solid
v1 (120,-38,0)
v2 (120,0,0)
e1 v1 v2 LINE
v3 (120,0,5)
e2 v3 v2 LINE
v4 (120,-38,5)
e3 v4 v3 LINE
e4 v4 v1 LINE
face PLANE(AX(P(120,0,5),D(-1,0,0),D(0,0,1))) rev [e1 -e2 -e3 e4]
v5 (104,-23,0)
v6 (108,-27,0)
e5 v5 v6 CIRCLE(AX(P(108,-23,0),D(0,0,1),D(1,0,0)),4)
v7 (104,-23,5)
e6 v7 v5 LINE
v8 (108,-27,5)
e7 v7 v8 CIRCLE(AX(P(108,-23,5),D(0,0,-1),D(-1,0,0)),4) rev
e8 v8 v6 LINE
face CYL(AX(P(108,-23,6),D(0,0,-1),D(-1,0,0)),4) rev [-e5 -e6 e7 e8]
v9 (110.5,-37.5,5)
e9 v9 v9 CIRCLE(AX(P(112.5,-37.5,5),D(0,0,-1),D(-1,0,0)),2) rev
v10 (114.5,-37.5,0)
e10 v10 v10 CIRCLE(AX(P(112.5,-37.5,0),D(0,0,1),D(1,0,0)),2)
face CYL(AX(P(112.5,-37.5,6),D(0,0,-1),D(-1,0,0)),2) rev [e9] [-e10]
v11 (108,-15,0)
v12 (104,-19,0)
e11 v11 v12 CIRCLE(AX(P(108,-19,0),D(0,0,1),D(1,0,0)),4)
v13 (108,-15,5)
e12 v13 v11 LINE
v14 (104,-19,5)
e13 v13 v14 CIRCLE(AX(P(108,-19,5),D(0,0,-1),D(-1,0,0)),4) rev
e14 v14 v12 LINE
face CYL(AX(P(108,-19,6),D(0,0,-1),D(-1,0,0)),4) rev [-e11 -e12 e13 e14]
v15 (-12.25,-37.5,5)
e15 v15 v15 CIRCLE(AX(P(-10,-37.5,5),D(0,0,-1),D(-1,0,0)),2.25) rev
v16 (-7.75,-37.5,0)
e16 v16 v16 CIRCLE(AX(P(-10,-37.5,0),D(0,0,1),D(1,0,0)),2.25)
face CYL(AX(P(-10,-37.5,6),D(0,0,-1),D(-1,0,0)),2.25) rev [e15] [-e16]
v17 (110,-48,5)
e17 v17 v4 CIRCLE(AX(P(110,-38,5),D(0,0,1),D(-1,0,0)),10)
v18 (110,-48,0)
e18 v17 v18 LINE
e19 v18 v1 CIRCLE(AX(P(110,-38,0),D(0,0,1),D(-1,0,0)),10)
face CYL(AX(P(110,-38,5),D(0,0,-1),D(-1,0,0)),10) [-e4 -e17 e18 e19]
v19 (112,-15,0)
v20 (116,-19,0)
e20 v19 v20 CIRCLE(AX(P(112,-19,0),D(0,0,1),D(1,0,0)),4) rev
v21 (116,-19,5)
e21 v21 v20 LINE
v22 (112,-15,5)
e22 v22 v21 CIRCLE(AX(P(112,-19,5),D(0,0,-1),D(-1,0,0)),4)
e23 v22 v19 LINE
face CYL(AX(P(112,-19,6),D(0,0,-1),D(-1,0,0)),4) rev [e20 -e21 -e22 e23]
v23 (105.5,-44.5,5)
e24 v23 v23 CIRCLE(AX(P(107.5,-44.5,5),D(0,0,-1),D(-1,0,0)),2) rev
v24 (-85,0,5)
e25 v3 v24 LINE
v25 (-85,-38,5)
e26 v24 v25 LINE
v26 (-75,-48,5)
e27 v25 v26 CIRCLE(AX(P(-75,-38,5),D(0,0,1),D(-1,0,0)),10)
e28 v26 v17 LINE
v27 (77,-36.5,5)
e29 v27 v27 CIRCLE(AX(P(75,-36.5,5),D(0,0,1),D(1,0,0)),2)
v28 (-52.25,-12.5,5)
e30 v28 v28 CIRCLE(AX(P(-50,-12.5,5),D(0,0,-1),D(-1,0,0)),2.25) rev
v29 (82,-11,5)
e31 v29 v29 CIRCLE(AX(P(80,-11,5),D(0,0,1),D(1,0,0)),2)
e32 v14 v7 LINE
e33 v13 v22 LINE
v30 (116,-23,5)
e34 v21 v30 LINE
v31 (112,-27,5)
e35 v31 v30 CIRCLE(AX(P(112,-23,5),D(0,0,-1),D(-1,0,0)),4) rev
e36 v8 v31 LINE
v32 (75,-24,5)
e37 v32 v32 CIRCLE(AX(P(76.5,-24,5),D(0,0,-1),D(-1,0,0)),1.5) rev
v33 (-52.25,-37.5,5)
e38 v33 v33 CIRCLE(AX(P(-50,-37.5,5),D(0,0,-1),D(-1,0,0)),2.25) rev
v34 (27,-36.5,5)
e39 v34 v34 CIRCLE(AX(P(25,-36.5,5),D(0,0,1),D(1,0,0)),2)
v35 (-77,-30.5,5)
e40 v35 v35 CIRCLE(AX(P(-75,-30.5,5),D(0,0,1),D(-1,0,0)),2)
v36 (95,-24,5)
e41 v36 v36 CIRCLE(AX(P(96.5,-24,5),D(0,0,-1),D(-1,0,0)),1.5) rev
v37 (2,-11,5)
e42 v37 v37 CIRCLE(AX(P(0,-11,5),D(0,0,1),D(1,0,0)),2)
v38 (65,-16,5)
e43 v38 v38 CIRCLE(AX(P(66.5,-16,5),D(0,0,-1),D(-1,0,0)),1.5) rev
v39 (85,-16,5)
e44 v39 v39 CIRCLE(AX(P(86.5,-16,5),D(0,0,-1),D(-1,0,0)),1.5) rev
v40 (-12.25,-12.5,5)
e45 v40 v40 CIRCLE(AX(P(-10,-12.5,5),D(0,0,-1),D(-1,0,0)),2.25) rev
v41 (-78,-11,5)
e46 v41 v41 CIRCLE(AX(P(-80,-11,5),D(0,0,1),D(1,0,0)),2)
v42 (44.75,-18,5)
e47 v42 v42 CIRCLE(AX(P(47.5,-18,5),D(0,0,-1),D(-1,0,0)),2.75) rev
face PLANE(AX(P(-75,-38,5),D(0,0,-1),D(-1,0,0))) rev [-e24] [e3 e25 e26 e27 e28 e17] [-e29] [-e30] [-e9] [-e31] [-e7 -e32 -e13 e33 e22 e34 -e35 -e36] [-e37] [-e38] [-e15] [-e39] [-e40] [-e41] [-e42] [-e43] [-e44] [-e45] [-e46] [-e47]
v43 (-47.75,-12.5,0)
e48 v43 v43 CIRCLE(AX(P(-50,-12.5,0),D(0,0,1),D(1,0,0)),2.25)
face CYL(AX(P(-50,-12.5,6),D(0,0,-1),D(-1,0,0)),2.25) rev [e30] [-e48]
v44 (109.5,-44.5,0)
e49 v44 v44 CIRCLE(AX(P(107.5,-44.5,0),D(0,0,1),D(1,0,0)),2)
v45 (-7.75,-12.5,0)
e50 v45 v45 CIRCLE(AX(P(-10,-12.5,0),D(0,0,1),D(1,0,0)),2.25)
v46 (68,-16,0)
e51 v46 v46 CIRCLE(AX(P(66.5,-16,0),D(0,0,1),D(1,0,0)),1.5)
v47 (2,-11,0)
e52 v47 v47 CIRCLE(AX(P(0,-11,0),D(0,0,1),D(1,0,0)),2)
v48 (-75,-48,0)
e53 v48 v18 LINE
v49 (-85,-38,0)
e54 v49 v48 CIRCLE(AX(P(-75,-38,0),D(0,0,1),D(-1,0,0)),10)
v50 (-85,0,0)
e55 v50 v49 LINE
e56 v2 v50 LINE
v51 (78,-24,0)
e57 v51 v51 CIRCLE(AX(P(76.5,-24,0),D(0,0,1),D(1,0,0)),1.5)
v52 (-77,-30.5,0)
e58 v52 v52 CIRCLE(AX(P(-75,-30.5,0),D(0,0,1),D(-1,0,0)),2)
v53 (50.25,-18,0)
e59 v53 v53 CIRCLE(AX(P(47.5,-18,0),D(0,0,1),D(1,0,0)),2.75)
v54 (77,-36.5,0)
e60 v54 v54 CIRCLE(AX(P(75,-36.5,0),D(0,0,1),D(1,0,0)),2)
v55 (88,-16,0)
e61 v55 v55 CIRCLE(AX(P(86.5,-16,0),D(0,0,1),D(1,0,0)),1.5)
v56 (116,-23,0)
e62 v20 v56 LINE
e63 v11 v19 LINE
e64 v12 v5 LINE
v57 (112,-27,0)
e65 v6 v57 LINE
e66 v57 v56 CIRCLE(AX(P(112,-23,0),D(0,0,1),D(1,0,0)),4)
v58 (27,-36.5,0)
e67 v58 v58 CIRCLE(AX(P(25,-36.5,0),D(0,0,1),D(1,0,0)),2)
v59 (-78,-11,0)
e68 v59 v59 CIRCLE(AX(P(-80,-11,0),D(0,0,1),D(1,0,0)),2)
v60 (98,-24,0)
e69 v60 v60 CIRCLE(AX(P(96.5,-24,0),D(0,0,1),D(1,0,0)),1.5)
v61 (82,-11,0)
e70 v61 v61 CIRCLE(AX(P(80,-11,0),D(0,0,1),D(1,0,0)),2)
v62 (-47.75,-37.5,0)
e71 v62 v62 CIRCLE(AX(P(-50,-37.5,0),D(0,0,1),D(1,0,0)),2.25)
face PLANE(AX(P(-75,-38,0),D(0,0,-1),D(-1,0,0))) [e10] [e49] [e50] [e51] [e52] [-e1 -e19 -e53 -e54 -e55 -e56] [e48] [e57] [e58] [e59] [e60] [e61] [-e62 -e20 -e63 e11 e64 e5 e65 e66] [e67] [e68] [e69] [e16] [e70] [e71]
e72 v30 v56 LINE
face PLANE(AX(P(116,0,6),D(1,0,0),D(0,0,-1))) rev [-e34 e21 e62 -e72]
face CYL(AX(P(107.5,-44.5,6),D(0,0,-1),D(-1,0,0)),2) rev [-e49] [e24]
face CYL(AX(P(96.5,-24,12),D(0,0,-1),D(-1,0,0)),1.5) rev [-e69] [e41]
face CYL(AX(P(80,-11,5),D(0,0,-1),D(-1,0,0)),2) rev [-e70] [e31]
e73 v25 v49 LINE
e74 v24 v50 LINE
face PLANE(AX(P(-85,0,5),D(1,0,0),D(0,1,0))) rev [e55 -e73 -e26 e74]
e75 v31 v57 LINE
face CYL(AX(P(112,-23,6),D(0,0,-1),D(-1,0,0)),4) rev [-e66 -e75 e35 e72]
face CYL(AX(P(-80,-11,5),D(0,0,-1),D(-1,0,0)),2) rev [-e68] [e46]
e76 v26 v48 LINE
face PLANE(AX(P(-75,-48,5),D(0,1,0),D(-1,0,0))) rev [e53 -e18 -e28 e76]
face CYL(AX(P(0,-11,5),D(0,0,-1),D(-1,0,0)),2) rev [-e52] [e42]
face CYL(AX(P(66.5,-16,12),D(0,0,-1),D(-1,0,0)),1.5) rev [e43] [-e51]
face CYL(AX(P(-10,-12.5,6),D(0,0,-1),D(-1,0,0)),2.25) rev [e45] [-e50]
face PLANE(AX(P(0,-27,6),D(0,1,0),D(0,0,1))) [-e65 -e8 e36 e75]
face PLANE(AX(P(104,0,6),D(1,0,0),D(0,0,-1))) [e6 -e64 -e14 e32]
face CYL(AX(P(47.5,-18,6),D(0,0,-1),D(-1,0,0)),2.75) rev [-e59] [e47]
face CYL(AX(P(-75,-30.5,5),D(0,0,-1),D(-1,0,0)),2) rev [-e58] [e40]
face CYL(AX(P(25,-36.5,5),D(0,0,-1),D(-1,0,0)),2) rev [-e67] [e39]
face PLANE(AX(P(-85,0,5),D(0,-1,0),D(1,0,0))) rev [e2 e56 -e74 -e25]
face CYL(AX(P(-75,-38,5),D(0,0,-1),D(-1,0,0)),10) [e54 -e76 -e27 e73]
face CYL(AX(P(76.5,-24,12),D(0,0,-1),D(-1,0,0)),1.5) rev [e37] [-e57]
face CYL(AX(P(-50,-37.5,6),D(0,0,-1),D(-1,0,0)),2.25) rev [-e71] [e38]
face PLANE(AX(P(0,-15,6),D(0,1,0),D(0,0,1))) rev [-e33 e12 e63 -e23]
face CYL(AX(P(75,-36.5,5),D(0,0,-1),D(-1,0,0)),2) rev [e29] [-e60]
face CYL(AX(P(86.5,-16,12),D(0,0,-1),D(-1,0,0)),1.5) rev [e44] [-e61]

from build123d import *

# Parameters (mm, degrees)
SKETCH_1_R              = 2
EXTRUDE_1_DEPTH         = 5
SKETCH_2_R              = 2.75
SKETCH_2_R_2            = 2
SKETCH_2_R_3            = 2.25
CUT_EXTRUDE_2_DEPTH     = 6
CUT_EXTRUDE_3_OUTLINE_R = 1.5
CUT_EXTRUDE_3_DEPTH     = 5


# Read off the part's stored shape, not the designer's step: 切除-拉伸3
with BuildPart() as part:
    # 草图1 → 凸台-拉伸1 (new body)
    with BuildSketch(Plane.XY):
        with BuildLine():
            Line((-85, 0), (120, 0))
            Line((120, 0), (120, -38))
            ThreePointArc((120, -38), (117.071067812, -45.071067812), (110, -48))
            Line((110, -48), (-75, -48))
            ThreePointArc((-75, -48), (-82.071067812, -45.071067812), (-85, -38))
            Line((-85, -38), (-85, 0))
        make_face()
        with Locations((-80, -11)):
            Circle(SKETCH_1_R, mode=Mode.SUBTRACT)
        with Locations((0, -11)):
            Circle(SKETCH_1_R, mode=Mode.SUBTRACT)
        with Locations((80, -11)):
            Circle(SKETCH_1_R, mode=Mode.SUBTRACT)
        with Locations((75, -36.5)):
            Circle(SKETCH_1_R, mode=Mode.SUBTRACT)
        with Locations(Location((-75, -30.5, 0), (0, 0, 180))):
            Circle(SKETCH_1_R, mode=Mode.SUBTRACT)
        with Locations((25, -36.5)):
            Circle(SKETCH_1_R, mode=Mode.SUBTRACT)
    extrude(amount=EXTRUDE_1_DEPTH)

    # 草图2 → 切除-拉伸2 (cut)
    with BuildSketch(Plane.XY):
        with Locations(Location((47.5, -18, 0), (0, 0, 180))):
            Circle(SKETCH_2_R)
        with Locations(Location((112.5, -37.5, 0), (0, 0, 180))):
            Circle(SKETCH_2_R_2)
        with Locations(Location((107.5, -44.5, 0), (0, 0, 180))):
            Circle(SKETCH_2_R_2)
        with BuildLine():
            ThreePointArc((104, -23), (105.171572875, -25.828427125), (108, -27))
            Line((108, -27), (112, -27))
            ThreePointArc((112, -27), (114.828427125, -25.828427125), (116, -23))
            Line((116, -23), (116, -19))
            ThreePointArc((116, -19), (114.828427125, -16.171572875), (112, -15))
            Line((112, -15), (108, -15))
            ThreePointArc((108, -15), (105.171572875, -16.171572875), (104, -19))
            Line((104, -19), (104, -23))
        make_face()
        with Locations(Location((-50, -12.5, 0), (0, 0, 180))):
            Circle(SKETCH_2_R_3)
        with Locations(Location((-10, -12.5, 0), (0, 0, 180))):
            Circle(SKETCH_2_R_3)
        with Locations(Location((-50, -37.5, 0), (0, 0, 180))):
            Circle(SKETCH_2_R_3)
        with Locations(Location((-10, -37.5, 0), (0, 0, 180))):
            Circle(SKETCH_2_R_3)
    extrude(amount=CUT_EXTRUDE_2_DEPTH, mode=Mode.SUBTRACT)

    # 切除-拉伸3 outline → 切除-拉伸3 (cut)
    with BuildSketch(Plane.XY):
        with Locations((96.5, -24)):
            Circle(CUT_EXTRUDE_3_OUTLINE_R)
        with Locations((86.5, -16)):
            Circle(CUT_EXTRUDE_3_OUTLINE_R)
        with Locations((76.5, -24)):
            Circle(CUT_EXTRUDE_3_OUTLINE_R)
        with Locations((66.5, -16)):
            Circle(CUT_EXTRUDE_3_OUTLINE_R)
    extrude(amount=CUT_EXTRUDE_3_DEPTH, mode=Mode.SUBTRACT)


solid = part.part
